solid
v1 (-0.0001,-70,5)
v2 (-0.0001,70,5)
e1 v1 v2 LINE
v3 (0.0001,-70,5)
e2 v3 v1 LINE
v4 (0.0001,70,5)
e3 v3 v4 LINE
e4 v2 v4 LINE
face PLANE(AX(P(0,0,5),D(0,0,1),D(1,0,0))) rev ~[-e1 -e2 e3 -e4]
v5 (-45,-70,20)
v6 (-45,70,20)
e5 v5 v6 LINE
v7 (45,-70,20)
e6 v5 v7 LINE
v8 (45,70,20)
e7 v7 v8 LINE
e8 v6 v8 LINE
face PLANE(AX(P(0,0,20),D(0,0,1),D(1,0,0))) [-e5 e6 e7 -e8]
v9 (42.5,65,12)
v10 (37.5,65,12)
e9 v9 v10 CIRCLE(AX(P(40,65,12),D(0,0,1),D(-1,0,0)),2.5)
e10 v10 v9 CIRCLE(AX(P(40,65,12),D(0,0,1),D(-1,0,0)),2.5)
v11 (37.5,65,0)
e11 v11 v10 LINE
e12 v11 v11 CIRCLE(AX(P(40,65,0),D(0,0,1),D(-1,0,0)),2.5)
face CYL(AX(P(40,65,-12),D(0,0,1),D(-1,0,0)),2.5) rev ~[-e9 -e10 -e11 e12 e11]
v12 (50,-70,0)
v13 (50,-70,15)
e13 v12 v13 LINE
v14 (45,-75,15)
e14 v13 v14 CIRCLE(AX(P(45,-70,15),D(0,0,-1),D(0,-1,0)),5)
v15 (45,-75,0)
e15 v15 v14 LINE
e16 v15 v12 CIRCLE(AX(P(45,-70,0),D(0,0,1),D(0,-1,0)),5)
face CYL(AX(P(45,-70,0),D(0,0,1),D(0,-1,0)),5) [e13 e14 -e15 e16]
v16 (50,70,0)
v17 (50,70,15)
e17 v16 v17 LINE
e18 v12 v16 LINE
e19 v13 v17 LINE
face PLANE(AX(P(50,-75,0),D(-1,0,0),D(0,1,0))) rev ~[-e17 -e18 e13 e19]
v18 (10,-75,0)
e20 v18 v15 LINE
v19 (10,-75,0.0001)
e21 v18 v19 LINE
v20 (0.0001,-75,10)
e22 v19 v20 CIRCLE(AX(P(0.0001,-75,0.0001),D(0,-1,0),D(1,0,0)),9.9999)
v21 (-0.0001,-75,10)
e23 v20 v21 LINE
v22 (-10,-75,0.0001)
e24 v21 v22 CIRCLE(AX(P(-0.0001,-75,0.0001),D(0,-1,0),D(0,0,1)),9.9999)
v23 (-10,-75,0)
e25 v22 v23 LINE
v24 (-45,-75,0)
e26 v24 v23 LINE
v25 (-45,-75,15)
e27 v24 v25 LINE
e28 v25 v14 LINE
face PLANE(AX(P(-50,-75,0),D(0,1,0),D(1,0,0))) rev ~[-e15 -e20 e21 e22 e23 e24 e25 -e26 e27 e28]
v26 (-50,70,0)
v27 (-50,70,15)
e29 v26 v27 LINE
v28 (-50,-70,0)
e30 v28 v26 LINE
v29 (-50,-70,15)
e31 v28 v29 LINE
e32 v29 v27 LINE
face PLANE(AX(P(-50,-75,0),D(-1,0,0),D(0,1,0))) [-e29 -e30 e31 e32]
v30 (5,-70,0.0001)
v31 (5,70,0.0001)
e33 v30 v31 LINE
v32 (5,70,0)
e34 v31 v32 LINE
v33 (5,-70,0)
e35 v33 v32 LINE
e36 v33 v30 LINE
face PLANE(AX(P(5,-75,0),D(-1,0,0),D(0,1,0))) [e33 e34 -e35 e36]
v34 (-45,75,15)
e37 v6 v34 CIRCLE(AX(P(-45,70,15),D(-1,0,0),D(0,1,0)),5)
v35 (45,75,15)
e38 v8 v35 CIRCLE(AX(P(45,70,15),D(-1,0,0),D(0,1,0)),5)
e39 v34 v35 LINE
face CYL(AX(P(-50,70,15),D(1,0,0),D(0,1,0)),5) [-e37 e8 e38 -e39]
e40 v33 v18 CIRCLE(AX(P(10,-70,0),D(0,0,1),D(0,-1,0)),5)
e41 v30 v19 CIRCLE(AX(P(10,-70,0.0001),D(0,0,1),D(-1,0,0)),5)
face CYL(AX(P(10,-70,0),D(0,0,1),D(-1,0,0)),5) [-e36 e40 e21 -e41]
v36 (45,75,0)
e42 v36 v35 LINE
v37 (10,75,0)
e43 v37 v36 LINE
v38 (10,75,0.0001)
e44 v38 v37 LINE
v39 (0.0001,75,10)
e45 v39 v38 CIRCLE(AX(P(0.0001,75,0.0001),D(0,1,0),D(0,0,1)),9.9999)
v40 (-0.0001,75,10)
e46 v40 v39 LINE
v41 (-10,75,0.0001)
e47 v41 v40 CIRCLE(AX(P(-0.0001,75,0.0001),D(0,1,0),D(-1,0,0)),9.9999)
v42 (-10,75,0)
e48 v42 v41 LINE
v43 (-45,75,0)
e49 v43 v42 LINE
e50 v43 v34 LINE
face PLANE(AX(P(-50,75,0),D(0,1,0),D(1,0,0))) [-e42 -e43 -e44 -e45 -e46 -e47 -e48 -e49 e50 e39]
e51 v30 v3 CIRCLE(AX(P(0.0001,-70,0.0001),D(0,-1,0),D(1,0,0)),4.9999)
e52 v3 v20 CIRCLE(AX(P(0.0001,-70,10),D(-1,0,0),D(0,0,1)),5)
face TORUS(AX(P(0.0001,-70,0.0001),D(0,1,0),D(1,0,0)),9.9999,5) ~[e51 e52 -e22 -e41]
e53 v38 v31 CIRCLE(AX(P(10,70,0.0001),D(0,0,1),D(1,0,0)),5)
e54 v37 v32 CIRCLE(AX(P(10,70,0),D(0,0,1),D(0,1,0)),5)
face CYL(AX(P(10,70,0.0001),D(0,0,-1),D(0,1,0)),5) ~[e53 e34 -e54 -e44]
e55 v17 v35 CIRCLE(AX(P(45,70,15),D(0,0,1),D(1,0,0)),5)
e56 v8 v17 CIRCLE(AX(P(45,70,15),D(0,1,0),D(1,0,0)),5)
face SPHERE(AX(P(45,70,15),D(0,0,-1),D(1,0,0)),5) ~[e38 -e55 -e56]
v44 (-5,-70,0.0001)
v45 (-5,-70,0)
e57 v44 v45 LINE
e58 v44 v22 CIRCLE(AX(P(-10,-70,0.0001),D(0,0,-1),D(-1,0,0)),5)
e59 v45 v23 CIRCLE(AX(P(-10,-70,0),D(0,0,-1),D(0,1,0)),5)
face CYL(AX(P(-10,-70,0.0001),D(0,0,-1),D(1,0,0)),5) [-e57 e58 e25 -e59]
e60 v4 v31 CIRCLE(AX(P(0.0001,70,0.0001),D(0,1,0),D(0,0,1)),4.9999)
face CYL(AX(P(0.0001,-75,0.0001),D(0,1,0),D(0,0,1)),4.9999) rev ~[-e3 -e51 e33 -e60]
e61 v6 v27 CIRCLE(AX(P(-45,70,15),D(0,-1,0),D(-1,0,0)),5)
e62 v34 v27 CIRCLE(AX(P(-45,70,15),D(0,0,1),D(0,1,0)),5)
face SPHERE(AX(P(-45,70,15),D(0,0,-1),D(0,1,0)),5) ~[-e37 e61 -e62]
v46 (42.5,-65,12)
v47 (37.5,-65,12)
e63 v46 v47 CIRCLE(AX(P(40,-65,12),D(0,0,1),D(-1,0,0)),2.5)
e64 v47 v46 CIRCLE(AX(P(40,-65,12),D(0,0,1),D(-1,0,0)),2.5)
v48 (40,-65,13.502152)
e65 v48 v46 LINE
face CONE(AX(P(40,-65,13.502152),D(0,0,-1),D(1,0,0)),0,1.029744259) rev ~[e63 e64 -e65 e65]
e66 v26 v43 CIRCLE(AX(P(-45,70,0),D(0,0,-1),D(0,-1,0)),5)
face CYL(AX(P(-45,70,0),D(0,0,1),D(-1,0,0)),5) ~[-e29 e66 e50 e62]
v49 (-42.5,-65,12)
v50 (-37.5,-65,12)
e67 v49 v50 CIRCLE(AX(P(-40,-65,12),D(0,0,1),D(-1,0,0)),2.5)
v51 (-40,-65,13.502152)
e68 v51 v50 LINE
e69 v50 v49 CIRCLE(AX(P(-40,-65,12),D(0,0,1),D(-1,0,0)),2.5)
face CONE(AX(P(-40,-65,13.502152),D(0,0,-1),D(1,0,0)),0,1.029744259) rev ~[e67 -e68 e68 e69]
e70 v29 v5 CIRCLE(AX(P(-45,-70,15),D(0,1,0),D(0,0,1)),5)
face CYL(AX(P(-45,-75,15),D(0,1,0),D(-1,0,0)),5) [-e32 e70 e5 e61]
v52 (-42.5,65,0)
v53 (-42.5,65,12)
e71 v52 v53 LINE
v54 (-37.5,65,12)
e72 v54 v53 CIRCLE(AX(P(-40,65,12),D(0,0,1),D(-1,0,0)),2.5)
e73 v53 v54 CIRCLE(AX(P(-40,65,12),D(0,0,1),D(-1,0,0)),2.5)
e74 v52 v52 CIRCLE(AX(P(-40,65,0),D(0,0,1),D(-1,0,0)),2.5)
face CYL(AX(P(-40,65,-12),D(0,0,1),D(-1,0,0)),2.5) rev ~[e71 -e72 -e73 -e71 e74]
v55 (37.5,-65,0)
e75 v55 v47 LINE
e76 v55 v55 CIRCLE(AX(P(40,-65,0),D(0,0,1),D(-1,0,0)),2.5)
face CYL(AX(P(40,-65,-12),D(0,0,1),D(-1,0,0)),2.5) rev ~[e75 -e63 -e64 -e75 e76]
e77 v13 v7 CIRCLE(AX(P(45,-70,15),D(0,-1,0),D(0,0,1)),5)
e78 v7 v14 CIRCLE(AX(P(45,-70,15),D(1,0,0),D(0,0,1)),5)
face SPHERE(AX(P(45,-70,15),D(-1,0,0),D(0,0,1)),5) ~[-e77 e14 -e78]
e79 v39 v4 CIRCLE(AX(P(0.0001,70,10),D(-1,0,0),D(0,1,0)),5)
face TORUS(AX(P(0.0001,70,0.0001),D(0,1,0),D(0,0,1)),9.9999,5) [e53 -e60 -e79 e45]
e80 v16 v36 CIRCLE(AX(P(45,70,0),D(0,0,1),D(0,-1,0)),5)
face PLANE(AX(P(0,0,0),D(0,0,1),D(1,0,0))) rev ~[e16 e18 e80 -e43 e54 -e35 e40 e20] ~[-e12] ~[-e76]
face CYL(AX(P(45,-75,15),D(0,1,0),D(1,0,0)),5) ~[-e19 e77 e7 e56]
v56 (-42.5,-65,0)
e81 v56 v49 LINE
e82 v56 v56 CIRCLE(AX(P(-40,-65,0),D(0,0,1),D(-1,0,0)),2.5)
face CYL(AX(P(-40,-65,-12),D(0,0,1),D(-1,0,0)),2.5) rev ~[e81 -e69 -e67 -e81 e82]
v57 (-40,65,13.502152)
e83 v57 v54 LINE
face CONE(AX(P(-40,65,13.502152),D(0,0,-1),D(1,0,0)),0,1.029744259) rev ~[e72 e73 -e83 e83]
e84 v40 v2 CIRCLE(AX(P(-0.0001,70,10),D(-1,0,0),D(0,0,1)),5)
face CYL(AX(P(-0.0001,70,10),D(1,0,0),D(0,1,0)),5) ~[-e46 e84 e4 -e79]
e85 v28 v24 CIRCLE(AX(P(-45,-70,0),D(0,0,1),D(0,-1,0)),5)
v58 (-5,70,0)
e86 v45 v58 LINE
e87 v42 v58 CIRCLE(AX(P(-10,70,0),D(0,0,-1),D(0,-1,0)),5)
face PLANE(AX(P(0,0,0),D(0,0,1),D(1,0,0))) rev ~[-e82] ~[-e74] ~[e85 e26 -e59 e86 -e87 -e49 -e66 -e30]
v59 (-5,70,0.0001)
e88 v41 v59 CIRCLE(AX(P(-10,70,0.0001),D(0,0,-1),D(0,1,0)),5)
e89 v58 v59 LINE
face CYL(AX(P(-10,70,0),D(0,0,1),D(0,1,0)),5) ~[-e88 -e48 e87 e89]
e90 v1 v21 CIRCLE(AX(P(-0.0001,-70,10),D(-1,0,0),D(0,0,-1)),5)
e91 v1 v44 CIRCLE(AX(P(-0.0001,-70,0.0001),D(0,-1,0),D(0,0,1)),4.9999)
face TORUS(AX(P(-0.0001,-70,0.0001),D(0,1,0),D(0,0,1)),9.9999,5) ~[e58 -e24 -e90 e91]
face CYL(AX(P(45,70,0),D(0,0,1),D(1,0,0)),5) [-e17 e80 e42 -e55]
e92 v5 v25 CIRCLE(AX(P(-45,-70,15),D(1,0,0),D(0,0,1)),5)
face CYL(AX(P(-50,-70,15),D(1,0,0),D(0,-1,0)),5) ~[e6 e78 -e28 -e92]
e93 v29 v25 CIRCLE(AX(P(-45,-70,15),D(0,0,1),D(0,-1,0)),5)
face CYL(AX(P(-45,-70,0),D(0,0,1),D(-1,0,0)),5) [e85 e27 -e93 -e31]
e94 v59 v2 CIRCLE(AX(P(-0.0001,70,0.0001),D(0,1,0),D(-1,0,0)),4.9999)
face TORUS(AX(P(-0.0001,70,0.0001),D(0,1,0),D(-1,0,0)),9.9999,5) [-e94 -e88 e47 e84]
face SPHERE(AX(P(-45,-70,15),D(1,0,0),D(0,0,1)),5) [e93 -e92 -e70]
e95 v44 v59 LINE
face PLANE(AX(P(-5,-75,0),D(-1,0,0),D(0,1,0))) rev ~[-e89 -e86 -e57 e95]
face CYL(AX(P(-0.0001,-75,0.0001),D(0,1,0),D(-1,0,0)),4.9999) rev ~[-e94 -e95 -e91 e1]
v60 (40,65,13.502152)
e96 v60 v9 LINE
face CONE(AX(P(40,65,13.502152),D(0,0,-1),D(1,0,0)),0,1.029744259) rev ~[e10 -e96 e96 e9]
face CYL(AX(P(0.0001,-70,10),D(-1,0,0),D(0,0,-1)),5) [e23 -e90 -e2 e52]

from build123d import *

# Parameters (mm, degrees)
F0_W     = 100
F0_H     = 150
F1_DEPTH = 20
F2_R     = 5
F3_D     = 5
F3_DEPTH = 12
F3_TIP   = 1.5021515476
F4_W     = 10
F4_H     = 150
F5_DEPTH = 5
F6_F1_R  = 4.9999
F6_F2_R  = 5


# Not quite as in the source:
# - a fillet or chamfer is up to 0.001 mm smaller than in the source, because OpenCascade refuses the exact size


with BuildPart() as f1:
    # F0 (on Top) → F1 (new body)
    with BuildSketch(Plane.XY):
        Rectangle(F0_W, F0_H)
    extrude(amount=F1_DEPTH)

    # F2
    f2_edges = [f1.edges().sort_by_distance(p)[0] for p in [
        (-50, 75, 10),
        (50, 75, 10),
        (0, -75, 20),
        (50, 0, 20),
        (0, 75, 20),
        (-50, 0, 20),
        (50, -75, 10),
        (-50, -75, 10),
    ]]
    fillet(f2_edges, radius=F2_R)

    # F3
    with Locations(Plane(origin=(0, 0, 0), x_dir=(1, 0, 0), z_dir=(0, 0, -1))):
        with Locations((40, -65), (-40, -65), (40, 65), (-40, 65)):
            Hole(F3_D / 2, depth=F3_DEPTH)
            with Locations((0, 0, -(F3_DEPTH + F3_TIP / 2))):  # 118° drill point
                Cone(0, F3_D / 2, F3_TIP, mode=Mode.SUBTRACT)

    # F4 (on face) → F5 (cut)
    with BuildSketch(Plane.XY):
        Rectangle(F4_W, F4_H)
    extrude(amount=F5_DEPTH, mode=Mode.SUBTRACT)

    # F6: fillet of radius 5 on 4 edges, made by hand

    # F6_f1 (radius 5 in the source; OpenCascade refuses exactly that, so slightly less here)
    f6_f1_edges = [f1.edges().sort_by_distance(p)[0] for p in [
        (5, 0, 5),
        (-5, 0, 5),
    ]]
    fillet(f6_f1_edges, radius=F6_F1_R)

    # F6_f2
    f6_f2_edges = [f1.edges().sort_by_distance(p)[0] for p in [
        (5, -75, 5e-05),
        (-5, 75, 5e-05),
        (-3.5355631953, 75, 3.5355631953),
        (3.5355631953, -75, 3.5355631953),
    ]]
    fillet(f6_f2_edges, radius=F6_F2_R)


solid = f1.part
